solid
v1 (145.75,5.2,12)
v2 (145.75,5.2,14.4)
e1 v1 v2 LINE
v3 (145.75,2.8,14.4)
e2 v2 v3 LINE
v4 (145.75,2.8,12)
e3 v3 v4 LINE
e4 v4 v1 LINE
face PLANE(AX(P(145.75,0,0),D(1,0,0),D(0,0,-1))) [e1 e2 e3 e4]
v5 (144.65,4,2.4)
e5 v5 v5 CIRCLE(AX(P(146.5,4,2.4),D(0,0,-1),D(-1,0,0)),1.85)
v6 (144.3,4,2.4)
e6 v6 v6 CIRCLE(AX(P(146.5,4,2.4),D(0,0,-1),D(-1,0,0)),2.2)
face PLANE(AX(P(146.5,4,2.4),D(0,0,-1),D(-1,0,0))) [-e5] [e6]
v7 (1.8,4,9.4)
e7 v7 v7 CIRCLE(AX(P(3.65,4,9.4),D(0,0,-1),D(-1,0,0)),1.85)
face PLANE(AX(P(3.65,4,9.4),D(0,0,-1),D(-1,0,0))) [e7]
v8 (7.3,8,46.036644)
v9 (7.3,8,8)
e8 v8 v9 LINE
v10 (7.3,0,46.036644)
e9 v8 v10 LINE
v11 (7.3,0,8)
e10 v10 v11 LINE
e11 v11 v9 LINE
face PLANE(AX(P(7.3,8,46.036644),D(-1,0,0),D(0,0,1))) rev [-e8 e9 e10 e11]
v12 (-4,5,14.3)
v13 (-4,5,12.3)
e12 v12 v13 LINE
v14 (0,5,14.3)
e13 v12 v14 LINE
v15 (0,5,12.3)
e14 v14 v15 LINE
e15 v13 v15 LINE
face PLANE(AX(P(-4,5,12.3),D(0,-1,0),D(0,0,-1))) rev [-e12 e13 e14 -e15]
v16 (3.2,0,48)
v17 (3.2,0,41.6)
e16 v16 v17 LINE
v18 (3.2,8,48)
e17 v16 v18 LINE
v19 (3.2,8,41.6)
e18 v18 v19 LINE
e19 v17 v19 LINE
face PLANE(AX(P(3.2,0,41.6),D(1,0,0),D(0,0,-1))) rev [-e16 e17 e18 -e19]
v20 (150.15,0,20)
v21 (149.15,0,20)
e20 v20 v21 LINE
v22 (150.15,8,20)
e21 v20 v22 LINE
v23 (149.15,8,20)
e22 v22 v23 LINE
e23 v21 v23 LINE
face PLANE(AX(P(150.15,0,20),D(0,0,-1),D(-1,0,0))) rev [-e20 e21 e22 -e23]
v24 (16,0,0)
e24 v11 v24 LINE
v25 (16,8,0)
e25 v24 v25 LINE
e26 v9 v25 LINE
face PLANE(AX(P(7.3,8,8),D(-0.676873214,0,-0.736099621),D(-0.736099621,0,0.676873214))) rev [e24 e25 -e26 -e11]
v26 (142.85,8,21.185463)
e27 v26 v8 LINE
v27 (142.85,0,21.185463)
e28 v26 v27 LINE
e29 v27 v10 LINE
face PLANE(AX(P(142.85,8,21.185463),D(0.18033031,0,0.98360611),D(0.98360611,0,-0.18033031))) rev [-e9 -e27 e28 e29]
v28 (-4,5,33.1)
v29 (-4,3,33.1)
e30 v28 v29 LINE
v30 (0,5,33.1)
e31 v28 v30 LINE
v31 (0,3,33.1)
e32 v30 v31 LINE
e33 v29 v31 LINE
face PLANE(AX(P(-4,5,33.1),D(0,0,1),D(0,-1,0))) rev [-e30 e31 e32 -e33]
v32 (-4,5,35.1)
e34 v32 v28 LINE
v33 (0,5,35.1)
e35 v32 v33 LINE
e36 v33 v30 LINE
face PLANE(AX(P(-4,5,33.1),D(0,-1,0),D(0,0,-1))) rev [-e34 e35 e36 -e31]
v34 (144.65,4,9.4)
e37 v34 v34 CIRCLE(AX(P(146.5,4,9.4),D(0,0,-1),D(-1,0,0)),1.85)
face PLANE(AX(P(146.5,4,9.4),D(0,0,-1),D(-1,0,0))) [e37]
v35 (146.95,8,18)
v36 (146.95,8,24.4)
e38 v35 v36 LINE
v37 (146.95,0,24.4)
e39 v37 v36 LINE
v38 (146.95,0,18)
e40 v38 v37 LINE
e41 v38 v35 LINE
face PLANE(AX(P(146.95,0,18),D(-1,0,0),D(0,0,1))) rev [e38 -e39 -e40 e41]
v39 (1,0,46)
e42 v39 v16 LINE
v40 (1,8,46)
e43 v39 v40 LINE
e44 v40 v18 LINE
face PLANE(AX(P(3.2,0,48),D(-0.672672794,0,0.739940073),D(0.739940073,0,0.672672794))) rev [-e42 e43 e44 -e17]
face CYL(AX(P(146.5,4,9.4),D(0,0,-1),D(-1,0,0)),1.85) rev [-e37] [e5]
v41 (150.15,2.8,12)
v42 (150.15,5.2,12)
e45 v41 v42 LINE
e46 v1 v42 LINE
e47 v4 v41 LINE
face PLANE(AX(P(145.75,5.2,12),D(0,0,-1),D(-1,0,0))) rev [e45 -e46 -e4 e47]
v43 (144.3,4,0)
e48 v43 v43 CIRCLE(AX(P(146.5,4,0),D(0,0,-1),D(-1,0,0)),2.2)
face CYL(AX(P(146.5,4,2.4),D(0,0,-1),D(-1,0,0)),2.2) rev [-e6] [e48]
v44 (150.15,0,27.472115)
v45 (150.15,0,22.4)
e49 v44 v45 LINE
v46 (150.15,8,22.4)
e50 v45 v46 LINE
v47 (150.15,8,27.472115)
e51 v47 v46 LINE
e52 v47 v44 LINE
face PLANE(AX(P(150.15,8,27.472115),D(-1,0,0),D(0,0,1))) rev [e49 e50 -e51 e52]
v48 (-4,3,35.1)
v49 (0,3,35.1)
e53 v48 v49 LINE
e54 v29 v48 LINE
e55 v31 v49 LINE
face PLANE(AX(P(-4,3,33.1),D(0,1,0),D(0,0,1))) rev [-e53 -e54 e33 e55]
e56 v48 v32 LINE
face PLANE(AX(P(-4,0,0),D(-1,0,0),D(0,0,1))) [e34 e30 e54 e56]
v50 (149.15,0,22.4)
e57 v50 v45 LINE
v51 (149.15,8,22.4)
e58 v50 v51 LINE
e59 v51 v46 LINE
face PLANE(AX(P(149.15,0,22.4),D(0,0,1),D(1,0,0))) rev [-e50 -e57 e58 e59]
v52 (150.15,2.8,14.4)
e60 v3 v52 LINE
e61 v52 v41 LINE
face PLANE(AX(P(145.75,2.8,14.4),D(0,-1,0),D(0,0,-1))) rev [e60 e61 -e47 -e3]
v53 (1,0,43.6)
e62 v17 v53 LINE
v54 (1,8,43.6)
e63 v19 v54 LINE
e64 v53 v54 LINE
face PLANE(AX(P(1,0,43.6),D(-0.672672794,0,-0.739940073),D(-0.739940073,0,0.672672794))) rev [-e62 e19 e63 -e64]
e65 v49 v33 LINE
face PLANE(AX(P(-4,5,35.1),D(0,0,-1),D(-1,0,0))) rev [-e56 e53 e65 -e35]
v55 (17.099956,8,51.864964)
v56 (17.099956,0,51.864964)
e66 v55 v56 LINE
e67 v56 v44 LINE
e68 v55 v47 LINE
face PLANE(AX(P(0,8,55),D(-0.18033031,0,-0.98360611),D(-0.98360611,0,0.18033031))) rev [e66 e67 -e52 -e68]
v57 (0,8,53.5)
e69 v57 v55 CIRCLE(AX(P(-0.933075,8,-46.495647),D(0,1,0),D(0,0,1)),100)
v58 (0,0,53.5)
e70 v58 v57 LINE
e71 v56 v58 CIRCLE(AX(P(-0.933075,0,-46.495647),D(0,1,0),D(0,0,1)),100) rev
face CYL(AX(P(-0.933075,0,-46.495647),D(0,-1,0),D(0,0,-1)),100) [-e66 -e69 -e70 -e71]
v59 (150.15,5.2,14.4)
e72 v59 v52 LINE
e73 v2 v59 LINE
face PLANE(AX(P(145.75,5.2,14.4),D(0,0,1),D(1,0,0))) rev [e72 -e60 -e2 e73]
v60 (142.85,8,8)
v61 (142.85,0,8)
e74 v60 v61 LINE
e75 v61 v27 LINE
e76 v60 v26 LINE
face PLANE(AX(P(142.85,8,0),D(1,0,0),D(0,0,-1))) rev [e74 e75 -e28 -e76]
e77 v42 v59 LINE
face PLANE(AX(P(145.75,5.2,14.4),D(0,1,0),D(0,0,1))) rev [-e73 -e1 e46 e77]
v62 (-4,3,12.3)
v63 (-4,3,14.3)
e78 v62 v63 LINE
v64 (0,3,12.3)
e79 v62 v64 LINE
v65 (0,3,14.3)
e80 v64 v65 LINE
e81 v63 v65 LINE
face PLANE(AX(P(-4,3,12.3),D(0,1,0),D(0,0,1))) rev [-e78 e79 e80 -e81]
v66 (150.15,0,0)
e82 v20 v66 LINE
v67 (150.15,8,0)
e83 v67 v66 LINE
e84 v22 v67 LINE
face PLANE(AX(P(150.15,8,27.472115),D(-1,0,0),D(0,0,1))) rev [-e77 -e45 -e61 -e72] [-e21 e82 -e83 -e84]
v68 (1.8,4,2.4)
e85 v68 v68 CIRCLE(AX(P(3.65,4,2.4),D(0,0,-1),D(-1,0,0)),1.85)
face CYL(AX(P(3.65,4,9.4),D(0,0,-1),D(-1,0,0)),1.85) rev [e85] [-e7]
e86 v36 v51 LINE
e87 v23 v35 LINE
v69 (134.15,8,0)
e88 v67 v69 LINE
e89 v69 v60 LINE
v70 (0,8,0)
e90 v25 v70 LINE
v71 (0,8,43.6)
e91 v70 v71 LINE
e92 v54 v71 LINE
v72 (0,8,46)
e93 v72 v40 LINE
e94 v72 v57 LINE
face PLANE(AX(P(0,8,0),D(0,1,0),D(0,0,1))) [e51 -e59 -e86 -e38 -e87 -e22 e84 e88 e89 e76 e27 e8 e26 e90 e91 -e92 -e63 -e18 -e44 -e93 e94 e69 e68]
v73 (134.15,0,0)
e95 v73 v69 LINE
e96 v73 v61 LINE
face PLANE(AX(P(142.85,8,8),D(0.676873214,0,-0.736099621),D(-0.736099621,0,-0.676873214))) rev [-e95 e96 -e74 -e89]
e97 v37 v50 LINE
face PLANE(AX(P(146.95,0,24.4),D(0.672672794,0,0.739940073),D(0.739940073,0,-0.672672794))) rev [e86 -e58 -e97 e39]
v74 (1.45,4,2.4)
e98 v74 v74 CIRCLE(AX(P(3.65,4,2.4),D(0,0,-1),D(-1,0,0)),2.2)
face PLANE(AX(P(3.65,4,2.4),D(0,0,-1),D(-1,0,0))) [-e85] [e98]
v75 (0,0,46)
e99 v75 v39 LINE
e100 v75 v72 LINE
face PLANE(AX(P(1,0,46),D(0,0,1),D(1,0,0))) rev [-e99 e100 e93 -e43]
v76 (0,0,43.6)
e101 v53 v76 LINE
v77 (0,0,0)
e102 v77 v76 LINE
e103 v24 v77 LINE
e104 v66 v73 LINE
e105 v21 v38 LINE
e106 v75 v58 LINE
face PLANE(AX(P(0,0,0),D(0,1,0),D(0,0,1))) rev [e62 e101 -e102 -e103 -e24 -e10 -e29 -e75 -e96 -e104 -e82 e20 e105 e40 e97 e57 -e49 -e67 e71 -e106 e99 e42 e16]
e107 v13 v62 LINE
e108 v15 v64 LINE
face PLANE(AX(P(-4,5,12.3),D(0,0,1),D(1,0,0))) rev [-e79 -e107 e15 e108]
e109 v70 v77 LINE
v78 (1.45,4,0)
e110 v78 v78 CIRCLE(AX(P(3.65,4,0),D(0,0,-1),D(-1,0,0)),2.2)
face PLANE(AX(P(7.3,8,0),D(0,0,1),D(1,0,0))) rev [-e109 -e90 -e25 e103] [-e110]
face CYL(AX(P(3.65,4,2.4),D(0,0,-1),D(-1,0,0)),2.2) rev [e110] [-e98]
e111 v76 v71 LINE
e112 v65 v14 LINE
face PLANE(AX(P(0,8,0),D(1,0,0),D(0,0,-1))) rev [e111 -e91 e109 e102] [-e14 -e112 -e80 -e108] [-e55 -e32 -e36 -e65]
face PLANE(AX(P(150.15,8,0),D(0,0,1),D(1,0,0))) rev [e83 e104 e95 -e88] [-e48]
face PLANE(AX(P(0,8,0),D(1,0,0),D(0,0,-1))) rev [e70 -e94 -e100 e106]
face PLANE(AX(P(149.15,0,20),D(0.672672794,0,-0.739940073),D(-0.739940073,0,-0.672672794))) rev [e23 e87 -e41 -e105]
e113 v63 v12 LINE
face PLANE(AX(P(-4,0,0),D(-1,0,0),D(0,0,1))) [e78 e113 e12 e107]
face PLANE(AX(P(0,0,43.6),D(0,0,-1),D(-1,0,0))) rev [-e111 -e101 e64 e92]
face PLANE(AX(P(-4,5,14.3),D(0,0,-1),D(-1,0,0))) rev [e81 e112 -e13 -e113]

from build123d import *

# Parameters (mm, degrees)
P_IDAT_VYSUNUT_M1_DEPTH  = 8
ODEBRAT_VYSUNUT_M1_DEPTH = 161.106285011
SKICA3_W                 = 2
SKICA3_H                 = 2
P_IDAT_VYSUNUT_M2_DEPTH  = 4
SKICA5_W                 = 16
SKICA5_H                 = 8
P_IDAT_VYSUNUT_M3_DEPTH  = 8
ODEBRAT_VYSUNUT_M4_DEPTH = 161.106285011
SKICA4_W                 = 2.4
SKICA4_H                 = 2.4
ODEBRAT_VYSUNUT_M2_DEPTH = 4.4
ODEBRAT_VYSUNUT_M5_DEPTH = 161.106285011
ODEBRAT_VYSUNUT_M6_DEPTH = 161.106285011
ZAOBLIT1_R               = 100
SKICA11_R                = 2.2
ODEBRAT_VYSUNUT_M7_DEPTH = 2.4
SKICA12_R                = 1.85
ODEBRAT_VYSUNUT_M8_DEPTH = 7


with BuildPart() as part:
    # Skica1 → Přidat vysunutím1 (new body)
    with BuildSketch(Plane(origin=(0, 0, 0), x_dir=(1, 0, 0), z_dir=(0, 1, 0))):
        Polygon((0, 0), (0, -55), (150.15, -27.472114866), (150.15, 0), (142.85, 0), (142.85, -21.185463454), (7.3, -46.036644473), (7.3, 0), align=None)
    extrude(amount=P_IDAT_VYSUNUT_M1_DEPTH)

    # Skica2 → Odebrat vysunutím1 (cut, through all)
    with BuildSketch(Plane(origin=(0, 8, 0), x_dir=(1, 0, 0), z_dir=(0, 1, 0))):
        Polygon((0, -43.6), (1, -43.6), (3.2, -41.6), (3.2, -48), (1, -46), (0, -46), align=None)
    extrude(amount=-ODEBRAT_VYSUNUT_M1_DEPTH, mode=Mode.SUBTRACT)

    # Skica3 → Přidat vysunutím2 (add)
    with BuildSketch(Plane.ZY):
        with Locations((13.3, 4)):
            Rectangle(SKICA3_W, SKICA3_H)
        with Locations((34.1, 4)):
            Rectangle(SKICA3_W, SKICA3_H)
    extrude(amount=P_IDAT_VYSUNUT_M2_DEPTH)

    # Skica5 → Přidat vysunutím3 (add)
    with BuildSketch(Plane(origin=(0, 8, 0), x_dir=(1, 0, 0), z_dir=(0, 1, 0))):
        with Locations((8, -4)):
            Rectangle(SKICA5_W, SKICA5_H)
        with Locations((142.15, -4)):
            Rectangle(SKICA5_W, SKICA5_H)
    extrude(amount=-P_IDAT_VYSUNUT_M3_DEPTH)

    # Skica7 → Odebrat vysunutím4 (cut, through all)
    with BuildSketch(Plane.XZ):
        Polygon((7.3, 8), (16, 0), (16, 8), align=None)
        Polygon((134.15, 0), (134.15, 8), (142.85, 8), align=None)
    extrude(amount=-ODEBRAT_VYSUNUT_M4_DEPTH, mode=Mode.SUBTRACT)

    # Skica4 → Odebrat vysunutím2 (cut)
    with BuildSketch(Plane(origin=(150.15, 0, 0), x_dir=(0, 0, -1), z_dir=(1, 0, 0))):
        with Locations((-13.2, 4)):
            Rectangle(SKICA4_W, SKICA4_H)
    extrude(amount=-ODEBRAT_VYSUNUT_M2_DEPTH, mode=Mode.SUBTRACT)

    # Skica8 → Odebrat vysunutím5 (cut, through all)
    with BuildSketch(Plane(origin=(0, 8, 0), x_dir=(1, 0, 0), z_dir=(0, 1, 0))):
        Polygon((150.15, -20), (149.15, -20), (146.95, -18), (146.95, -24.4), (149.15, -22.4), (150.15, -22.4), align=None)
    extrude(amount=-ODEBRAT_VYSUNUT_M5_DEPTH, mode=Mode.SUBTRACT)

    # Skica9 → Odebrat vysunutím6 (cut, through all)
    with BuildSketch(Plane(origin=(0, 8, 0), x_dir=(1, 0, 0), z_dir=(0, 1, 0))):
        Polygon((0, -53.5), (8.181703712, -53.5), (0, -55), align=None)
    extrude(amount=-ODEBRAT_VYSUNUT_M6_DEPTH, mode=Mode.SUBTRACT)

    # Zaoblit1
    # the kernel refuses this fillet: 100 mm, written as the material it takes off along each edge
    with BuildSketch(Plane(origin=(8.181703712, 30.667234564, 53.5), x_dir=(0.9836061098745081, 0, -0.18033030975833525), z_dir=(0, -1, 0))) as zaoblit1_piece_1:
        with BuildLine():
            CenterArc((9.066893825, -100), ZAOBLIT1_R, 90, 9.854379591)
            Line((-8.047573761, -1.475409165), (-8.389863112, 0.495082652))
            ThreePointArc((-8.389863112, 0.495082652), (-4.3844475, 1.229507637), (-0.36066062, 1.96721222))
            Line((-0.36066062, 1.96721222), (0, 2))
            Line((0, 2), (9.066893825, 2))
            Line((9.066893825, 2), (9.066893825, 0))
        make_face()
    extrude(amount=53.334469127, mode=Mode.SUBTRACT)

    # Skica11 → Odebrat vysunutím7 (cut)
    with BuildSketch(Plane(origin=(0, 0, 0), x_dir=(-1, 0, 0), z_dir=(0, 0, -1))):
        with Locations((-146.5, 4)):
            Circle(SKICA11_R)
        with Locations((-3.65, 4)):
            Circle(SKICA11_R)
    extrude(amount=-ODEBRAT_VYSUNUT_M7_DEPTH, mode=Mode.SUBTRACT)

    # Skica12 → Odebrat vysunutím8 (cut)
    with BuildSketch(Plane(origin=(0, 0, 2.4), x_dir=(-1, 0, 0), z_dir=(0, 0, -1))):
        with Locations((-146.5, 4)):
            Circle(SKICA12_R)
        with Locations((-3.65, 4)):
            Circle(SKICA12_R)
    extrude(amount=-ODEBRAT_VYSUNUT_M8_DEPTH, mode=Mode.SUBTRACT)


solid = part.part
